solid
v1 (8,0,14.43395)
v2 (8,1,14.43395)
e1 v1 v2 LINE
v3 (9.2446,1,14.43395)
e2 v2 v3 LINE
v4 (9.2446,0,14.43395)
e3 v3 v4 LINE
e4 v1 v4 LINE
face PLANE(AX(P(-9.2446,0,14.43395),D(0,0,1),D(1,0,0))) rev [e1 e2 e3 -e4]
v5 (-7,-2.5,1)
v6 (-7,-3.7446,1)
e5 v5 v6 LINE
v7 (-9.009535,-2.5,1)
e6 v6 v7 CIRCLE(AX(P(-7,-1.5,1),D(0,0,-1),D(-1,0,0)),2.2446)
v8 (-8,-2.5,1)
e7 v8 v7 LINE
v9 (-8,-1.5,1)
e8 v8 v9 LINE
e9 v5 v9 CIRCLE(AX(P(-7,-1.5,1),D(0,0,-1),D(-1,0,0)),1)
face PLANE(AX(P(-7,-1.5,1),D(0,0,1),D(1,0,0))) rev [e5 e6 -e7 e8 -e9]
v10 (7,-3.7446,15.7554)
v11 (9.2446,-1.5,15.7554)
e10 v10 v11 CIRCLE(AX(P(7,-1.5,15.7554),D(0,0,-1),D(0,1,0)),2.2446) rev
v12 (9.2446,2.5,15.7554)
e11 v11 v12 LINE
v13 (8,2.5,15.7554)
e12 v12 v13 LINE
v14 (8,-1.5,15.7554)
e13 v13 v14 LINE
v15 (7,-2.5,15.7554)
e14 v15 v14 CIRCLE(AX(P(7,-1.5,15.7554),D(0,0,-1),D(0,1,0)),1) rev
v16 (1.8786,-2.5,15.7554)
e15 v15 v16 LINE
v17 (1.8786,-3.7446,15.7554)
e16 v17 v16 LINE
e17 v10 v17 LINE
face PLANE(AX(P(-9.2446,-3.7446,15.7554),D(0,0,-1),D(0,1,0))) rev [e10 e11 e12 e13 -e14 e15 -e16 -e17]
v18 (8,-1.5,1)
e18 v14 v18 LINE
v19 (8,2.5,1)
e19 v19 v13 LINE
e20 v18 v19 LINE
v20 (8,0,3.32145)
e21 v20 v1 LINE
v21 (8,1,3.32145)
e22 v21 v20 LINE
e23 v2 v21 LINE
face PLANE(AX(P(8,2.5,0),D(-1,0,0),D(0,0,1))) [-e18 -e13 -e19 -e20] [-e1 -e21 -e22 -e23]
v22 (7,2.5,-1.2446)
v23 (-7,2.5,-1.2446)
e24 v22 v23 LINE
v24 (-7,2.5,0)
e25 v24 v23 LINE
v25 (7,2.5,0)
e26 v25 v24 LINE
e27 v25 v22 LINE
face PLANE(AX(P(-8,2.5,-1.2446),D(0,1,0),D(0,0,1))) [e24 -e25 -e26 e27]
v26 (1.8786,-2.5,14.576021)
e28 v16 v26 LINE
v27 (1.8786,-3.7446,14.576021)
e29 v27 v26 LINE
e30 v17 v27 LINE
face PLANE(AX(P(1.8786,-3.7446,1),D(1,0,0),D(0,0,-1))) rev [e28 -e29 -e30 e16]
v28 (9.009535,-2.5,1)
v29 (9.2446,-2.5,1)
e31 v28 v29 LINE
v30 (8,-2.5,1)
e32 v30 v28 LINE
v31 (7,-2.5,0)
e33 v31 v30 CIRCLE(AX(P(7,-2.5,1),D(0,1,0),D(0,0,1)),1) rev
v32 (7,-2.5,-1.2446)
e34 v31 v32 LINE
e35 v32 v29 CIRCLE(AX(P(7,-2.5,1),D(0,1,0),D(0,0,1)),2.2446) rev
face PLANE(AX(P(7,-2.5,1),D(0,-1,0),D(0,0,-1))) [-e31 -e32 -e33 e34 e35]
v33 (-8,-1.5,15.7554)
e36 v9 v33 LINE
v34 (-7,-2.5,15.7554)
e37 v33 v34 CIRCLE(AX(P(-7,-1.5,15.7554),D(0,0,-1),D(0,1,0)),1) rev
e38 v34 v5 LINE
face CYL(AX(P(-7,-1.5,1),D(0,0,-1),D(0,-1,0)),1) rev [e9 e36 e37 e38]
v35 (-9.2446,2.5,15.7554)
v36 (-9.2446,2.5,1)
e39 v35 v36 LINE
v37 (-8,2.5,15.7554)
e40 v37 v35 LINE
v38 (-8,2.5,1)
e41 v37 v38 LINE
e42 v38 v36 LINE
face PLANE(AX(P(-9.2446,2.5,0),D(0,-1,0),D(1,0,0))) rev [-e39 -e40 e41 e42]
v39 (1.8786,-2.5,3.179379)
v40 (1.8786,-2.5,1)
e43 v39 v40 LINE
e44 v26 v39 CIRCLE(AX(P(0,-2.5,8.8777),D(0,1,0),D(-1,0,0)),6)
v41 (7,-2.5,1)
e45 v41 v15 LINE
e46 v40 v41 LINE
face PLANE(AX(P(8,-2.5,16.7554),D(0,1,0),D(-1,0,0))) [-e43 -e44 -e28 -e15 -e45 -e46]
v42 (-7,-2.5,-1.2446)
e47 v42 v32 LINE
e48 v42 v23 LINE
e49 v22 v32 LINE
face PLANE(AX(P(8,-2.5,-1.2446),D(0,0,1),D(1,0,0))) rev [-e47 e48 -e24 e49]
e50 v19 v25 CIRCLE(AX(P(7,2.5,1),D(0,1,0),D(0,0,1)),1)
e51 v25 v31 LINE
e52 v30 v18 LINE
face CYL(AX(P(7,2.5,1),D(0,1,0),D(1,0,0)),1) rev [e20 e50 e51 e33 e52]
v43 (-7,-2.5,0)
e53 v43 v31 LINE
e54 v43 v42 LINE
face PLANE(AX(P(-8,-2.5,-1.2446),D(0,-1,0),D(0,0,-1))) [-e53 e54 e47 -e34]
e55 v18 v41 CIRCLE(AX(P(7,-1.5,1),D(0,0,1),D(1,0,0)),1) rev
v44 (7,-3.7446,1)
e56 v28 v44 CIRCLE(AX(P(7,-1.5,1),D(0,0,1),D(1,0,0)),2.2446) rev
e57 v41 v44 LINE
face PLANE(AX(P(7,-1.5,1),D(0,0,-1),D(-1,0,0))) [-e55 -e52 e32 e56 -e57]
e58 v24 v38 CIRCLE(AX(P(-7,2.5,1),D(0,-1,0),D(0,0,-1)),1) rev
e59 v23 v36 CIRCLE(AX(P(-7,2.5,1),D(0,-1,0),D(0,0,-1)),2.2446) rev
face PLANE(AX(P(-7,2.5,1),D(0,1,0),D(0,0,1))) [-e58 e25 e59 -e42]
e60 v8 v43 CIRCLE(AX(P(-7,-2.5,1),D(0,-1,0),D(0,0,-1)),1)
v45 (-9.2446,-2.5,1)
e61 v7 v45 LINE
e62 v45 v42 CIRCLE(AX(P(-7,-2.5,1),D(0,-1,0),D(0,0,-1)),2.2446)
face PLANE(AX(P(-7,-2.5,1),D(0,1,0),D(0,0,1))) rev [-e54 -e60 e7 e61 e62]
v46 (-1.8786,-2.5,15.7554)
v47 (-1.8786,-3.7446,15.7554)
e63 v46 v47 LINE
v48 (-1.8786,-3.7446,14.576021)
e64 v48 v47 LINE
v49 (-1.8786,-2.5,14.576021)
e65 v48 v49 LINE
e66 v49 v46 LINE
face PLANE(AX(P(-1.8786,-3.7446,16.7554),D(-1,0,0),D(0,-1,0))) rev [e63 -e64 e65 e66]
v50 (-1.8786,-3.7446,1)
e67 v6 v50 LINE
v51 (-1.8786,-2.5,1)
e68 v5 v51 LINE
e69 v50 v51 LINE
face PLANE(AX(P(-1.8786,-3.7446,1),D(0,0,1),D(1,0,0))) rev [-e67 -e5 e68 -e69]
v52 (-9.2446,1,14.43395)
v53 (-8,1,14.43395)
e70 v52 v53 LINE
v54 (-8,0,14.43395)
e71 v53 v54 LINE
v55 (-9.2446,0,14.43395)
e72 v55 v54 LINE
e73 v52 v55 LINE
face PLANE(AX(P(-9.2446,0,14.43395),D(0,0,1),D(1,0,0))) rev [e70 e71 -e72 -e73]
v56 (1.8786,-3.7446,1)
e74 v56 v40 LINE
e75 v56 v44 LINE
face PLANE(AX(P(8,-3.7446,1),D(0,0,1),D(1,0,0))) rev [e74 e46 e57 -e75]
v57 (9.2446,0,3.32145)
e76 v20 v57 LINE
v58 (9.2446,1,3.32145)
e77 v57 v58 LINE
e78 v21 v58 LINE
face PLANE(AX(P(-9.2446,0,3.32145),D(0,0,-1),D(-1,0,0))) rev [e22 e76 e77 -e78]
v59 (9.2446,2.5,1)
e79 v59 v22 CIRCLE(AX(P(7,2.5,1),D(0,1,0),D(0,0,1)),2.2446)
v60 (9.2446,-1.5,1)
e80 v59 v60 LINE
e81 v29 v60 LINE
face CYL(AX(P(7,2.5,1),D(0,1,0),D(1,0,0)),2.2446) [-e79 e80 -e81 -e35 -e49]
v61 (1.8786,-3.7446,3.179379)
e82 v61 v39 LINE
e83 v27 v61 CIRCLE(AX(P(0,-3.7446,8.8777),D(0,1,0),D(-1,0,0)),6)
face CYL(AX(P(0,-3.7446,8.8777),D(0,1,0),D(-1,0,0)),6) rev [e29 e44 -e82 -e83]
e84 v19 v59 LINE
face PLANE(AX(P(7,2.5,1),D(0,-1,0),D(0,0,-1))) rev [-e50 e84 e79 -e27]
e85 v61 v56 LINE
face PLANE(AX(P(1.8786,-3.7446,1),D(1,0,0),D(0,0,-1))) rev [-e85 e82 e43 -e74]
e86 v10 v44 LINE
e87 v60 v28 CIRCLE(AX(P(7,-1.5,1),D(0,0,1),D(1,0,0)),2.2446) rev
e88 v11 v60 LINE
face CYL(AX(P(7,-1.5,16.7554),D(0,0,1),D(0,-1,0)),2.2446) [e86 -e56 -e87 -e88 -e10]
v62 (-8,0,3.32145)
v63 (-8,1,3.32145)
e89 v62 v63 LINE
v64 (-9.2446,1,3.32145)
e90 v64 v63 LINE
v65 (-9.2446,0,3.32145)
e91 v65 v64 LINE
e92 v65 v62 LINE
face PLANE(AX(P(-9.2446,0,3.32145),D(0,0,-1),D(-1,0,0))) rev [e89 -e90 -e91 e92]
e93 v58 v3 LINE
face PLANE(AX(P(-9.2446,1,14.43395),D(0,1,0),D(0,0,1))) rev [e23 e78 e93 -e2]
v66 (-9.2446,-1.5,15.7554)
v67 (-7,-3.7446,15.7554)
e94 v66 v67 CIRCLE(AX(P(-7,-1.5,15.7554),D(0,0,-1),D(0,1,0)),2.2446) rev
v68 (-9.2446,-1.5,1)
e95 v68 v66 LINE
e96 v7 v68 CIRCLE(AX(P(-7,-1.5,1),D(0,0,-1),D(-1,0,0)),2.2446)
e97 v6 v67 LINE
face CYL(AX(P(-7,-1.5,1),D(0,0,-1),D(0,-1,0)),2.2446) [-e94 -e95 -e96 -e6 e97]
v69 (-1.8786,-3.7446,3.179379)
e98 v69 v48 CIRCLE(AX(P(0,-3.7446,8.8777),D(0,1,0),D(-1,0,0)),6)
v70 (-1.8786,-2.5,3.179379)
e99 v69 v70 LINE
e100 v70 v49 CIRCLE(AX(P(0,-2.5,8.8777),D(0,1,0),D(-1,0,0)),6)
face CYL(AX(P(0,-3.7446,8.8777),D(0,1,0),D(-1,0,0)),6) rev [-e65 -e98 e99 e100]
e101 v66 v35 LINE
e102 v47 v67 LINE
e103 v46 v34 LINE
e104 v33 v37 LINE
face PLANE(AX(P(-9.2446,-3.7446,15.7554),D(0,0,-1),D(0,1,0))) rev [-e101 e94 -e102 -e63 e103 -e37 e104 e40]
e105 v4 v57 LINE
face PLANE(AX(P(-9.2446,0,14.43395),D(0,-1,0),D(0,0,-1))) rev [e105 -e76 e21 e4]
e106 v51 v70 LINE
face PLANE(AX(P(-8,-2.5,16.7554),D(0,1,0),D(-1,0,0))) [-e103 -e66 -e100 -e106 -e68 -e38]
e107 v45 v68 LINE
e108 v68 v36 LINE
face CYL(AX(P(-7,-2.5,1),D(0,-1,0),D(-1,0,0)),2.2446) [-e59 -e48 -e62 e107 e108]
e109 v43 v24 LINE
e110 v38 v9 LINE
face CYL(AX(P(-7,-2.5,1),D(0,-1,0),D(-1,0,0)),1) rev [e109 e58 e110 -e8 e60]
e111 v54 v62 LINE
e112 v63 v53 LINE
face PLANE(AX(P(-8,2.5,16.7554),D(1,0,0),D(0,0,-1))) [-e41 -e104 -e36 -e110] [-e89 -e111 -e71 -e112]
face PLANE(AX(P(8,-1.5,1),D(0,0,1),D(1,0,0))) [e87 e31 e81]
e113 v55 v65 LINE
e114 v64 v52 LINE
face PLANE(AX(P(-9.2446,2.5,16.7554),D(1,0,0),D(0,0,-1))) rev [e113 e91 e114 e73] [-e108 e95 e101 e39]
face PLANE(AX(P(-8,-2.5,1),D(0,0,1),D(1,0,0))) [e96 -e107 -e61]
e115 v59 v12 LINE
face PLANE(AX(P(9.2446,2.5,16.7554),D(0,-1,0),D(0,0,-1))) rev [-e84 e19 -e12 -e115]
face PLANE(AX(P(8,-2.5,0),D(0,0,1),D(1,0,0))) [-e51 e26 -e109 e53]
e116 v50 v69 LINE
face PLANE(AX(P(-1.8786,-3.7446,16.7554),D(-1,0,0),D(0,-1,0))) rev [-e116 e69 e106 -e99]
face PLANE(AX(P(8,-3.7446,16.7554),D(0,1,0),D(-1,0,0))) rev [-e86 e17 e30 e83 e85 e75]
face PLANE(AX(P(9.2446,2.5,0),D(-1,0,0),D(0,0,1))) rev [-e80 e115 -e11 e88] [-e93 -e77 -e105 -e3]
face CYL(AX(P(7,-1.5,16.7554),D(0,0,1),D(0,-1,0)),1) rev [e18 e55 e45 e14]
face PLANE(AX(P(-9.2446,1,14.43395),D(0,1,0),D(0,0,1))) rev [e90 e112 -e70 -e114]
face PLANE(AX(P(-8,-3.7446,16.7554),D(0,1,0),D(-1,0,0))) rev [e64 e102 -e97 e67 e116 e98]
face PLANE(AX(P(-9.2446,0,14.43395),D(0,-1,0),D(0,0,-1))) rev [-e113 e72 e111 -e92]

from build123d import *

# Parameters (mm, degrees)
SKETCH1_W                      = 16
SKETCH1_H                      = 5
BASE_FLANGE1_DEPTH             = 1.2446
EDGE_FLANGE1_STRIP_W           = 6.9784
EDGE_FLANGE1_STRIP_H           = 1.2446
EDGE_FLANGE1_STRIP_CUT_DEPTH   = 5
EDGE_FLANGE1_STRIP_2_W         = 6.9784
EDGE_FLANGE1_STRIP_2_H         = 1.2446
EDGE_FLANGE1_STRIP_CUT_2_DEPTH = 5
EDGE_FLANGE1_DEPTH             = 5
EDGE_FLANGE1_BEND_DEPTH        = 5
EDGE_FLANGE2_STRIP_W           = 6.9784
EDGE_FLANGE2_STRIP_H           = 1.2446
EDGE_FLANGE2_STRIP_CUT_DEPTH   = 15.7554
EDGE_FLANGE2_STRIP_2_W         = 6.9784
EDGE_FLANGE2_STRIP_2_H         = 1.2446
EDGE_FLANGE2_STRIP_CUT_2_DEPTH = 15.7554
EDGE_FLANGE2_DEPTH             = 15.7554
EDGE_FLANGE2_BEND_DEPTH        = 15.7554
SKETCH15_R                     = 6
CUT_EXTRUDE1_DEPTH             = 20.778929656
SKETCH16_W                     = 11.1125
SKETCH16_H                     = 1
CUT_EXTRUDE2_DEPTH             = 26.231249968
SKETCH17_W                     = 18.4892
SKETCH17_H                     = 1
CUT_EXTRUDE3_DEPTH             = 21.129607236


# Sheet-metal steps are written as plain solids
with BuildPart() as part:
    # Sketch1 → Base-Flange1 (new body)
    with BuildSketch(Plane.XY):
        Rectangle(SKETCH1_W, SKETCH1_H)
    extrude(amount=-BASE_FLANGE1_DEPTH)

    # Edge-Flange1 strip (across the edge) → Edge-Flange1 strip cut (cut)
    with BuildSketch(Plane(origin=(8, -2.5, 0), x_dir=(-1, 0, 0), z_dir=(0, 1, 0))):
        with Locations((-2.4892, -0.6223)):
            Rectangle(EDGE_FLANGE1_STRIP_W, EDGE_FLANGE1_STRIP_H)
    extrude(amount=EDGE_FLANGE1_STRIP_CUT_DEPTH, mode=Mode.SUBTRACT)

    # Edge-Flange1 strip 2 (across the edge) → Edge-Flange1 strip cut 2 (cut)
    with BuildSketch(Plane(origin=(-8, 2.5, 0), x_dir=(1, 0, 0), z_dir=(0, -1, 0))):
        with Locations((-2.4892, -0.6223)):
            Rectangle(EDGE_FLANGE1_STRIP_2_W, EDGE_FLANGE1_STRIP_2_H)
    extrude(amount=EDGE_FLANGE1_STRIP_CUT_2_DEPTH, mode=Mode.SUBTRACT)

    # Edge-Flange1 section (across the edge) → Edge-Flange1 (add)
    with BuildSketch(Plane(origin=(8, -2.5, 0), x_dir=(-1, 0, 0), z_dir=(0, 1, 0))):
        with BuildLine():
            Line((-1.2446, 1), (-1.2446, 16.7554))
            Line((-1.2446, 16.7554), (0, 16.7554))
            Line((0, 16.7554), (0, 1))
            ThreePointArc((0, 1), (0.292893219, 0.292893219), (1, 0))
            Line((1, 0), (1, -1.2446))
            ThreePointArc((1, -1.2446), (-0.587171881, -0.587171881), (-1.2446, 1))
        make_face()
    extrude(amount=EDGE_FLANGE1_DEPTH)

    # Edge-Flange1 section 2 (across the edge) → Edge-Flange1 bend (add)
    with BuildSketch(Plane(origin=(-8, 2.5, 0), x_dir=(1, 0, 0), z_dir=(0, -1, 0))):
        with BuildLine():
            Line((-1.2446, 1), (-1.2446, 16.7554))
            Line((-1.2446, 16.7554), (0, 16.7554))
            Line((0, 16.7554), (0, 1))
            ThreePointArc((0, 1), (0.292893219, 0.292893219), (1, 0))
            Line((1, 0), (1, -1.2446))
            ThreePointArc((1, -1.2446), (-0.587171881, -0.587171881), (-1.2446, 1))
        make_face()
    extrude(amount=EDGE_FLANGE1_BEND_DEPTH)

    # Edge-Flange2 strip (across the edge) → Edge-Flange2 strip cut (cut)
    with BuildSketch(Plane(origin=(-8, -2.5, 16.7554), x_dir=(0, 1, 0), z_dir=(0, 0, -1))):
        with Locations((-2.4892, -0.6223)):
            Rectangle(EDGE_FLANGE2_STRIP_W, EDGE_FLANGE2_STRIP_H)
    extrude(amount=EDGE_FLANGE2_STRIP_CUT_DEPTH, mode=Mode.SUBTRACT)

    # Edge-Flange2 strip 2 (across the edge) → Edge-Flange2 strip cut 2 (cut)
    with BuildSketch(Plane(origin=(8, -2.5, 1), x_dir=(0, 1, 0), z_dir=(0, 0, 1))):
        with Locations((-2.4892, -0.6223)):
            Rectangle(EDGE_FLANGE2_STRIP_2_W, EDGE_FLANGE2_STRIP_2_H)
    extrude(amount=EDGE_FLANGE2_STRIP_CUT_2_DEPTH, mode=Mode.SUBTRACT)

    # Edge-Flange2 section (across the edge) → Edge-Flange2 (add)
    with BuildSketch(Plane(origin=(-8, -2.5, 16.7554), x_dir=(0, 1, 0), z_dir=(0, 0, -1))):
        with BuildLine():
            Line((-1.2446, 1), (-1.2446, 6.1214))
            Line((-1.2446, 6.1214), (0, 6.1214))
            Line((0, 6.1214), (0, 1))
            ThreePointArc((0, 1), (0.292893219, 0.292893219), (1, 0))
            Line((1, 0), (1, -1.2446))
            ThreePointArc((1, -1.2446), (-0.587171881, -0.587171881), (-1.2446, 1))
        make_face()
    extrude(amount=EDGE_FLANGE2_DEPTH)

    # Edge-Flange2 section 2 (across the edge) → Edge-Flange2 bend (add)
    with BuildSketch(Plane(origin=(8, -2.5, 1), x_dir=(0, 1, 0), z_dir=(0, 0, 1))):
        with BuildLine():
            Line((-1.2446, 1), (-1.2446, 6.1214))
            Line((-1.2446, 6.1214), (0, 6.1214))
            Line((0, 6.1214), (0, 1))
            ThreePointArc((0, 1), (0.292893219, 0.292893219), (1, 0))
            Line((1, 0), (1, -1.2446))
            ThreePointArc((1, -1.2446), (-0.587171881, -0.587171881), (-1.2446, 1))
        make_face()
    extrude(amount=EDGE_FLANGE2_BEND_DEPTH)

    # Sketch15 → Cut-Extrude1 (cut, through all)
    with BuildSketch(Plane(origin=(0, -2.5, 0), x_dir=(1, 0, 0), z_dir=(0, 1, 0))):
        with Locations((0, -8.8777)):
            Circle(SKETCH15_R)
    extrude(amount=-CUT_EXTRUDE1_DEPTH, mode=Mode.SUBTRACT)

    # Sketch16 → Cut-Extrude2 (cut, through all)
    with BuildSketch(Plane(origin=(9.2446, 0, 0), x_dir=(0, 0, -1), z_dir=(1, 0, 0))):
        with Locations((-8.8777, 0.5)):
            Rectangle(SKETCH16_W, SKETCH16_H)
    extrude(amount=-CUT_EXTRUDE2_DEPTH, mode=Mode.SUBTRACT)

    # Sketch17 → Cut-Extrude3 (cut, through all)
    with BuildSketch(Plane(origin=(0, 2.5, 0), x_dir=(1, 0, 0), z_dir=(0, 1, 0))):
        with Locations((0, -16.2554)):
            Rectangle(SKETCH17_W, SKETCH17_H)
    extrude(amount=-CUT_EXTRUDE3_DEPTH, mode=Mode.SUBTRACT)


solid = part.part
